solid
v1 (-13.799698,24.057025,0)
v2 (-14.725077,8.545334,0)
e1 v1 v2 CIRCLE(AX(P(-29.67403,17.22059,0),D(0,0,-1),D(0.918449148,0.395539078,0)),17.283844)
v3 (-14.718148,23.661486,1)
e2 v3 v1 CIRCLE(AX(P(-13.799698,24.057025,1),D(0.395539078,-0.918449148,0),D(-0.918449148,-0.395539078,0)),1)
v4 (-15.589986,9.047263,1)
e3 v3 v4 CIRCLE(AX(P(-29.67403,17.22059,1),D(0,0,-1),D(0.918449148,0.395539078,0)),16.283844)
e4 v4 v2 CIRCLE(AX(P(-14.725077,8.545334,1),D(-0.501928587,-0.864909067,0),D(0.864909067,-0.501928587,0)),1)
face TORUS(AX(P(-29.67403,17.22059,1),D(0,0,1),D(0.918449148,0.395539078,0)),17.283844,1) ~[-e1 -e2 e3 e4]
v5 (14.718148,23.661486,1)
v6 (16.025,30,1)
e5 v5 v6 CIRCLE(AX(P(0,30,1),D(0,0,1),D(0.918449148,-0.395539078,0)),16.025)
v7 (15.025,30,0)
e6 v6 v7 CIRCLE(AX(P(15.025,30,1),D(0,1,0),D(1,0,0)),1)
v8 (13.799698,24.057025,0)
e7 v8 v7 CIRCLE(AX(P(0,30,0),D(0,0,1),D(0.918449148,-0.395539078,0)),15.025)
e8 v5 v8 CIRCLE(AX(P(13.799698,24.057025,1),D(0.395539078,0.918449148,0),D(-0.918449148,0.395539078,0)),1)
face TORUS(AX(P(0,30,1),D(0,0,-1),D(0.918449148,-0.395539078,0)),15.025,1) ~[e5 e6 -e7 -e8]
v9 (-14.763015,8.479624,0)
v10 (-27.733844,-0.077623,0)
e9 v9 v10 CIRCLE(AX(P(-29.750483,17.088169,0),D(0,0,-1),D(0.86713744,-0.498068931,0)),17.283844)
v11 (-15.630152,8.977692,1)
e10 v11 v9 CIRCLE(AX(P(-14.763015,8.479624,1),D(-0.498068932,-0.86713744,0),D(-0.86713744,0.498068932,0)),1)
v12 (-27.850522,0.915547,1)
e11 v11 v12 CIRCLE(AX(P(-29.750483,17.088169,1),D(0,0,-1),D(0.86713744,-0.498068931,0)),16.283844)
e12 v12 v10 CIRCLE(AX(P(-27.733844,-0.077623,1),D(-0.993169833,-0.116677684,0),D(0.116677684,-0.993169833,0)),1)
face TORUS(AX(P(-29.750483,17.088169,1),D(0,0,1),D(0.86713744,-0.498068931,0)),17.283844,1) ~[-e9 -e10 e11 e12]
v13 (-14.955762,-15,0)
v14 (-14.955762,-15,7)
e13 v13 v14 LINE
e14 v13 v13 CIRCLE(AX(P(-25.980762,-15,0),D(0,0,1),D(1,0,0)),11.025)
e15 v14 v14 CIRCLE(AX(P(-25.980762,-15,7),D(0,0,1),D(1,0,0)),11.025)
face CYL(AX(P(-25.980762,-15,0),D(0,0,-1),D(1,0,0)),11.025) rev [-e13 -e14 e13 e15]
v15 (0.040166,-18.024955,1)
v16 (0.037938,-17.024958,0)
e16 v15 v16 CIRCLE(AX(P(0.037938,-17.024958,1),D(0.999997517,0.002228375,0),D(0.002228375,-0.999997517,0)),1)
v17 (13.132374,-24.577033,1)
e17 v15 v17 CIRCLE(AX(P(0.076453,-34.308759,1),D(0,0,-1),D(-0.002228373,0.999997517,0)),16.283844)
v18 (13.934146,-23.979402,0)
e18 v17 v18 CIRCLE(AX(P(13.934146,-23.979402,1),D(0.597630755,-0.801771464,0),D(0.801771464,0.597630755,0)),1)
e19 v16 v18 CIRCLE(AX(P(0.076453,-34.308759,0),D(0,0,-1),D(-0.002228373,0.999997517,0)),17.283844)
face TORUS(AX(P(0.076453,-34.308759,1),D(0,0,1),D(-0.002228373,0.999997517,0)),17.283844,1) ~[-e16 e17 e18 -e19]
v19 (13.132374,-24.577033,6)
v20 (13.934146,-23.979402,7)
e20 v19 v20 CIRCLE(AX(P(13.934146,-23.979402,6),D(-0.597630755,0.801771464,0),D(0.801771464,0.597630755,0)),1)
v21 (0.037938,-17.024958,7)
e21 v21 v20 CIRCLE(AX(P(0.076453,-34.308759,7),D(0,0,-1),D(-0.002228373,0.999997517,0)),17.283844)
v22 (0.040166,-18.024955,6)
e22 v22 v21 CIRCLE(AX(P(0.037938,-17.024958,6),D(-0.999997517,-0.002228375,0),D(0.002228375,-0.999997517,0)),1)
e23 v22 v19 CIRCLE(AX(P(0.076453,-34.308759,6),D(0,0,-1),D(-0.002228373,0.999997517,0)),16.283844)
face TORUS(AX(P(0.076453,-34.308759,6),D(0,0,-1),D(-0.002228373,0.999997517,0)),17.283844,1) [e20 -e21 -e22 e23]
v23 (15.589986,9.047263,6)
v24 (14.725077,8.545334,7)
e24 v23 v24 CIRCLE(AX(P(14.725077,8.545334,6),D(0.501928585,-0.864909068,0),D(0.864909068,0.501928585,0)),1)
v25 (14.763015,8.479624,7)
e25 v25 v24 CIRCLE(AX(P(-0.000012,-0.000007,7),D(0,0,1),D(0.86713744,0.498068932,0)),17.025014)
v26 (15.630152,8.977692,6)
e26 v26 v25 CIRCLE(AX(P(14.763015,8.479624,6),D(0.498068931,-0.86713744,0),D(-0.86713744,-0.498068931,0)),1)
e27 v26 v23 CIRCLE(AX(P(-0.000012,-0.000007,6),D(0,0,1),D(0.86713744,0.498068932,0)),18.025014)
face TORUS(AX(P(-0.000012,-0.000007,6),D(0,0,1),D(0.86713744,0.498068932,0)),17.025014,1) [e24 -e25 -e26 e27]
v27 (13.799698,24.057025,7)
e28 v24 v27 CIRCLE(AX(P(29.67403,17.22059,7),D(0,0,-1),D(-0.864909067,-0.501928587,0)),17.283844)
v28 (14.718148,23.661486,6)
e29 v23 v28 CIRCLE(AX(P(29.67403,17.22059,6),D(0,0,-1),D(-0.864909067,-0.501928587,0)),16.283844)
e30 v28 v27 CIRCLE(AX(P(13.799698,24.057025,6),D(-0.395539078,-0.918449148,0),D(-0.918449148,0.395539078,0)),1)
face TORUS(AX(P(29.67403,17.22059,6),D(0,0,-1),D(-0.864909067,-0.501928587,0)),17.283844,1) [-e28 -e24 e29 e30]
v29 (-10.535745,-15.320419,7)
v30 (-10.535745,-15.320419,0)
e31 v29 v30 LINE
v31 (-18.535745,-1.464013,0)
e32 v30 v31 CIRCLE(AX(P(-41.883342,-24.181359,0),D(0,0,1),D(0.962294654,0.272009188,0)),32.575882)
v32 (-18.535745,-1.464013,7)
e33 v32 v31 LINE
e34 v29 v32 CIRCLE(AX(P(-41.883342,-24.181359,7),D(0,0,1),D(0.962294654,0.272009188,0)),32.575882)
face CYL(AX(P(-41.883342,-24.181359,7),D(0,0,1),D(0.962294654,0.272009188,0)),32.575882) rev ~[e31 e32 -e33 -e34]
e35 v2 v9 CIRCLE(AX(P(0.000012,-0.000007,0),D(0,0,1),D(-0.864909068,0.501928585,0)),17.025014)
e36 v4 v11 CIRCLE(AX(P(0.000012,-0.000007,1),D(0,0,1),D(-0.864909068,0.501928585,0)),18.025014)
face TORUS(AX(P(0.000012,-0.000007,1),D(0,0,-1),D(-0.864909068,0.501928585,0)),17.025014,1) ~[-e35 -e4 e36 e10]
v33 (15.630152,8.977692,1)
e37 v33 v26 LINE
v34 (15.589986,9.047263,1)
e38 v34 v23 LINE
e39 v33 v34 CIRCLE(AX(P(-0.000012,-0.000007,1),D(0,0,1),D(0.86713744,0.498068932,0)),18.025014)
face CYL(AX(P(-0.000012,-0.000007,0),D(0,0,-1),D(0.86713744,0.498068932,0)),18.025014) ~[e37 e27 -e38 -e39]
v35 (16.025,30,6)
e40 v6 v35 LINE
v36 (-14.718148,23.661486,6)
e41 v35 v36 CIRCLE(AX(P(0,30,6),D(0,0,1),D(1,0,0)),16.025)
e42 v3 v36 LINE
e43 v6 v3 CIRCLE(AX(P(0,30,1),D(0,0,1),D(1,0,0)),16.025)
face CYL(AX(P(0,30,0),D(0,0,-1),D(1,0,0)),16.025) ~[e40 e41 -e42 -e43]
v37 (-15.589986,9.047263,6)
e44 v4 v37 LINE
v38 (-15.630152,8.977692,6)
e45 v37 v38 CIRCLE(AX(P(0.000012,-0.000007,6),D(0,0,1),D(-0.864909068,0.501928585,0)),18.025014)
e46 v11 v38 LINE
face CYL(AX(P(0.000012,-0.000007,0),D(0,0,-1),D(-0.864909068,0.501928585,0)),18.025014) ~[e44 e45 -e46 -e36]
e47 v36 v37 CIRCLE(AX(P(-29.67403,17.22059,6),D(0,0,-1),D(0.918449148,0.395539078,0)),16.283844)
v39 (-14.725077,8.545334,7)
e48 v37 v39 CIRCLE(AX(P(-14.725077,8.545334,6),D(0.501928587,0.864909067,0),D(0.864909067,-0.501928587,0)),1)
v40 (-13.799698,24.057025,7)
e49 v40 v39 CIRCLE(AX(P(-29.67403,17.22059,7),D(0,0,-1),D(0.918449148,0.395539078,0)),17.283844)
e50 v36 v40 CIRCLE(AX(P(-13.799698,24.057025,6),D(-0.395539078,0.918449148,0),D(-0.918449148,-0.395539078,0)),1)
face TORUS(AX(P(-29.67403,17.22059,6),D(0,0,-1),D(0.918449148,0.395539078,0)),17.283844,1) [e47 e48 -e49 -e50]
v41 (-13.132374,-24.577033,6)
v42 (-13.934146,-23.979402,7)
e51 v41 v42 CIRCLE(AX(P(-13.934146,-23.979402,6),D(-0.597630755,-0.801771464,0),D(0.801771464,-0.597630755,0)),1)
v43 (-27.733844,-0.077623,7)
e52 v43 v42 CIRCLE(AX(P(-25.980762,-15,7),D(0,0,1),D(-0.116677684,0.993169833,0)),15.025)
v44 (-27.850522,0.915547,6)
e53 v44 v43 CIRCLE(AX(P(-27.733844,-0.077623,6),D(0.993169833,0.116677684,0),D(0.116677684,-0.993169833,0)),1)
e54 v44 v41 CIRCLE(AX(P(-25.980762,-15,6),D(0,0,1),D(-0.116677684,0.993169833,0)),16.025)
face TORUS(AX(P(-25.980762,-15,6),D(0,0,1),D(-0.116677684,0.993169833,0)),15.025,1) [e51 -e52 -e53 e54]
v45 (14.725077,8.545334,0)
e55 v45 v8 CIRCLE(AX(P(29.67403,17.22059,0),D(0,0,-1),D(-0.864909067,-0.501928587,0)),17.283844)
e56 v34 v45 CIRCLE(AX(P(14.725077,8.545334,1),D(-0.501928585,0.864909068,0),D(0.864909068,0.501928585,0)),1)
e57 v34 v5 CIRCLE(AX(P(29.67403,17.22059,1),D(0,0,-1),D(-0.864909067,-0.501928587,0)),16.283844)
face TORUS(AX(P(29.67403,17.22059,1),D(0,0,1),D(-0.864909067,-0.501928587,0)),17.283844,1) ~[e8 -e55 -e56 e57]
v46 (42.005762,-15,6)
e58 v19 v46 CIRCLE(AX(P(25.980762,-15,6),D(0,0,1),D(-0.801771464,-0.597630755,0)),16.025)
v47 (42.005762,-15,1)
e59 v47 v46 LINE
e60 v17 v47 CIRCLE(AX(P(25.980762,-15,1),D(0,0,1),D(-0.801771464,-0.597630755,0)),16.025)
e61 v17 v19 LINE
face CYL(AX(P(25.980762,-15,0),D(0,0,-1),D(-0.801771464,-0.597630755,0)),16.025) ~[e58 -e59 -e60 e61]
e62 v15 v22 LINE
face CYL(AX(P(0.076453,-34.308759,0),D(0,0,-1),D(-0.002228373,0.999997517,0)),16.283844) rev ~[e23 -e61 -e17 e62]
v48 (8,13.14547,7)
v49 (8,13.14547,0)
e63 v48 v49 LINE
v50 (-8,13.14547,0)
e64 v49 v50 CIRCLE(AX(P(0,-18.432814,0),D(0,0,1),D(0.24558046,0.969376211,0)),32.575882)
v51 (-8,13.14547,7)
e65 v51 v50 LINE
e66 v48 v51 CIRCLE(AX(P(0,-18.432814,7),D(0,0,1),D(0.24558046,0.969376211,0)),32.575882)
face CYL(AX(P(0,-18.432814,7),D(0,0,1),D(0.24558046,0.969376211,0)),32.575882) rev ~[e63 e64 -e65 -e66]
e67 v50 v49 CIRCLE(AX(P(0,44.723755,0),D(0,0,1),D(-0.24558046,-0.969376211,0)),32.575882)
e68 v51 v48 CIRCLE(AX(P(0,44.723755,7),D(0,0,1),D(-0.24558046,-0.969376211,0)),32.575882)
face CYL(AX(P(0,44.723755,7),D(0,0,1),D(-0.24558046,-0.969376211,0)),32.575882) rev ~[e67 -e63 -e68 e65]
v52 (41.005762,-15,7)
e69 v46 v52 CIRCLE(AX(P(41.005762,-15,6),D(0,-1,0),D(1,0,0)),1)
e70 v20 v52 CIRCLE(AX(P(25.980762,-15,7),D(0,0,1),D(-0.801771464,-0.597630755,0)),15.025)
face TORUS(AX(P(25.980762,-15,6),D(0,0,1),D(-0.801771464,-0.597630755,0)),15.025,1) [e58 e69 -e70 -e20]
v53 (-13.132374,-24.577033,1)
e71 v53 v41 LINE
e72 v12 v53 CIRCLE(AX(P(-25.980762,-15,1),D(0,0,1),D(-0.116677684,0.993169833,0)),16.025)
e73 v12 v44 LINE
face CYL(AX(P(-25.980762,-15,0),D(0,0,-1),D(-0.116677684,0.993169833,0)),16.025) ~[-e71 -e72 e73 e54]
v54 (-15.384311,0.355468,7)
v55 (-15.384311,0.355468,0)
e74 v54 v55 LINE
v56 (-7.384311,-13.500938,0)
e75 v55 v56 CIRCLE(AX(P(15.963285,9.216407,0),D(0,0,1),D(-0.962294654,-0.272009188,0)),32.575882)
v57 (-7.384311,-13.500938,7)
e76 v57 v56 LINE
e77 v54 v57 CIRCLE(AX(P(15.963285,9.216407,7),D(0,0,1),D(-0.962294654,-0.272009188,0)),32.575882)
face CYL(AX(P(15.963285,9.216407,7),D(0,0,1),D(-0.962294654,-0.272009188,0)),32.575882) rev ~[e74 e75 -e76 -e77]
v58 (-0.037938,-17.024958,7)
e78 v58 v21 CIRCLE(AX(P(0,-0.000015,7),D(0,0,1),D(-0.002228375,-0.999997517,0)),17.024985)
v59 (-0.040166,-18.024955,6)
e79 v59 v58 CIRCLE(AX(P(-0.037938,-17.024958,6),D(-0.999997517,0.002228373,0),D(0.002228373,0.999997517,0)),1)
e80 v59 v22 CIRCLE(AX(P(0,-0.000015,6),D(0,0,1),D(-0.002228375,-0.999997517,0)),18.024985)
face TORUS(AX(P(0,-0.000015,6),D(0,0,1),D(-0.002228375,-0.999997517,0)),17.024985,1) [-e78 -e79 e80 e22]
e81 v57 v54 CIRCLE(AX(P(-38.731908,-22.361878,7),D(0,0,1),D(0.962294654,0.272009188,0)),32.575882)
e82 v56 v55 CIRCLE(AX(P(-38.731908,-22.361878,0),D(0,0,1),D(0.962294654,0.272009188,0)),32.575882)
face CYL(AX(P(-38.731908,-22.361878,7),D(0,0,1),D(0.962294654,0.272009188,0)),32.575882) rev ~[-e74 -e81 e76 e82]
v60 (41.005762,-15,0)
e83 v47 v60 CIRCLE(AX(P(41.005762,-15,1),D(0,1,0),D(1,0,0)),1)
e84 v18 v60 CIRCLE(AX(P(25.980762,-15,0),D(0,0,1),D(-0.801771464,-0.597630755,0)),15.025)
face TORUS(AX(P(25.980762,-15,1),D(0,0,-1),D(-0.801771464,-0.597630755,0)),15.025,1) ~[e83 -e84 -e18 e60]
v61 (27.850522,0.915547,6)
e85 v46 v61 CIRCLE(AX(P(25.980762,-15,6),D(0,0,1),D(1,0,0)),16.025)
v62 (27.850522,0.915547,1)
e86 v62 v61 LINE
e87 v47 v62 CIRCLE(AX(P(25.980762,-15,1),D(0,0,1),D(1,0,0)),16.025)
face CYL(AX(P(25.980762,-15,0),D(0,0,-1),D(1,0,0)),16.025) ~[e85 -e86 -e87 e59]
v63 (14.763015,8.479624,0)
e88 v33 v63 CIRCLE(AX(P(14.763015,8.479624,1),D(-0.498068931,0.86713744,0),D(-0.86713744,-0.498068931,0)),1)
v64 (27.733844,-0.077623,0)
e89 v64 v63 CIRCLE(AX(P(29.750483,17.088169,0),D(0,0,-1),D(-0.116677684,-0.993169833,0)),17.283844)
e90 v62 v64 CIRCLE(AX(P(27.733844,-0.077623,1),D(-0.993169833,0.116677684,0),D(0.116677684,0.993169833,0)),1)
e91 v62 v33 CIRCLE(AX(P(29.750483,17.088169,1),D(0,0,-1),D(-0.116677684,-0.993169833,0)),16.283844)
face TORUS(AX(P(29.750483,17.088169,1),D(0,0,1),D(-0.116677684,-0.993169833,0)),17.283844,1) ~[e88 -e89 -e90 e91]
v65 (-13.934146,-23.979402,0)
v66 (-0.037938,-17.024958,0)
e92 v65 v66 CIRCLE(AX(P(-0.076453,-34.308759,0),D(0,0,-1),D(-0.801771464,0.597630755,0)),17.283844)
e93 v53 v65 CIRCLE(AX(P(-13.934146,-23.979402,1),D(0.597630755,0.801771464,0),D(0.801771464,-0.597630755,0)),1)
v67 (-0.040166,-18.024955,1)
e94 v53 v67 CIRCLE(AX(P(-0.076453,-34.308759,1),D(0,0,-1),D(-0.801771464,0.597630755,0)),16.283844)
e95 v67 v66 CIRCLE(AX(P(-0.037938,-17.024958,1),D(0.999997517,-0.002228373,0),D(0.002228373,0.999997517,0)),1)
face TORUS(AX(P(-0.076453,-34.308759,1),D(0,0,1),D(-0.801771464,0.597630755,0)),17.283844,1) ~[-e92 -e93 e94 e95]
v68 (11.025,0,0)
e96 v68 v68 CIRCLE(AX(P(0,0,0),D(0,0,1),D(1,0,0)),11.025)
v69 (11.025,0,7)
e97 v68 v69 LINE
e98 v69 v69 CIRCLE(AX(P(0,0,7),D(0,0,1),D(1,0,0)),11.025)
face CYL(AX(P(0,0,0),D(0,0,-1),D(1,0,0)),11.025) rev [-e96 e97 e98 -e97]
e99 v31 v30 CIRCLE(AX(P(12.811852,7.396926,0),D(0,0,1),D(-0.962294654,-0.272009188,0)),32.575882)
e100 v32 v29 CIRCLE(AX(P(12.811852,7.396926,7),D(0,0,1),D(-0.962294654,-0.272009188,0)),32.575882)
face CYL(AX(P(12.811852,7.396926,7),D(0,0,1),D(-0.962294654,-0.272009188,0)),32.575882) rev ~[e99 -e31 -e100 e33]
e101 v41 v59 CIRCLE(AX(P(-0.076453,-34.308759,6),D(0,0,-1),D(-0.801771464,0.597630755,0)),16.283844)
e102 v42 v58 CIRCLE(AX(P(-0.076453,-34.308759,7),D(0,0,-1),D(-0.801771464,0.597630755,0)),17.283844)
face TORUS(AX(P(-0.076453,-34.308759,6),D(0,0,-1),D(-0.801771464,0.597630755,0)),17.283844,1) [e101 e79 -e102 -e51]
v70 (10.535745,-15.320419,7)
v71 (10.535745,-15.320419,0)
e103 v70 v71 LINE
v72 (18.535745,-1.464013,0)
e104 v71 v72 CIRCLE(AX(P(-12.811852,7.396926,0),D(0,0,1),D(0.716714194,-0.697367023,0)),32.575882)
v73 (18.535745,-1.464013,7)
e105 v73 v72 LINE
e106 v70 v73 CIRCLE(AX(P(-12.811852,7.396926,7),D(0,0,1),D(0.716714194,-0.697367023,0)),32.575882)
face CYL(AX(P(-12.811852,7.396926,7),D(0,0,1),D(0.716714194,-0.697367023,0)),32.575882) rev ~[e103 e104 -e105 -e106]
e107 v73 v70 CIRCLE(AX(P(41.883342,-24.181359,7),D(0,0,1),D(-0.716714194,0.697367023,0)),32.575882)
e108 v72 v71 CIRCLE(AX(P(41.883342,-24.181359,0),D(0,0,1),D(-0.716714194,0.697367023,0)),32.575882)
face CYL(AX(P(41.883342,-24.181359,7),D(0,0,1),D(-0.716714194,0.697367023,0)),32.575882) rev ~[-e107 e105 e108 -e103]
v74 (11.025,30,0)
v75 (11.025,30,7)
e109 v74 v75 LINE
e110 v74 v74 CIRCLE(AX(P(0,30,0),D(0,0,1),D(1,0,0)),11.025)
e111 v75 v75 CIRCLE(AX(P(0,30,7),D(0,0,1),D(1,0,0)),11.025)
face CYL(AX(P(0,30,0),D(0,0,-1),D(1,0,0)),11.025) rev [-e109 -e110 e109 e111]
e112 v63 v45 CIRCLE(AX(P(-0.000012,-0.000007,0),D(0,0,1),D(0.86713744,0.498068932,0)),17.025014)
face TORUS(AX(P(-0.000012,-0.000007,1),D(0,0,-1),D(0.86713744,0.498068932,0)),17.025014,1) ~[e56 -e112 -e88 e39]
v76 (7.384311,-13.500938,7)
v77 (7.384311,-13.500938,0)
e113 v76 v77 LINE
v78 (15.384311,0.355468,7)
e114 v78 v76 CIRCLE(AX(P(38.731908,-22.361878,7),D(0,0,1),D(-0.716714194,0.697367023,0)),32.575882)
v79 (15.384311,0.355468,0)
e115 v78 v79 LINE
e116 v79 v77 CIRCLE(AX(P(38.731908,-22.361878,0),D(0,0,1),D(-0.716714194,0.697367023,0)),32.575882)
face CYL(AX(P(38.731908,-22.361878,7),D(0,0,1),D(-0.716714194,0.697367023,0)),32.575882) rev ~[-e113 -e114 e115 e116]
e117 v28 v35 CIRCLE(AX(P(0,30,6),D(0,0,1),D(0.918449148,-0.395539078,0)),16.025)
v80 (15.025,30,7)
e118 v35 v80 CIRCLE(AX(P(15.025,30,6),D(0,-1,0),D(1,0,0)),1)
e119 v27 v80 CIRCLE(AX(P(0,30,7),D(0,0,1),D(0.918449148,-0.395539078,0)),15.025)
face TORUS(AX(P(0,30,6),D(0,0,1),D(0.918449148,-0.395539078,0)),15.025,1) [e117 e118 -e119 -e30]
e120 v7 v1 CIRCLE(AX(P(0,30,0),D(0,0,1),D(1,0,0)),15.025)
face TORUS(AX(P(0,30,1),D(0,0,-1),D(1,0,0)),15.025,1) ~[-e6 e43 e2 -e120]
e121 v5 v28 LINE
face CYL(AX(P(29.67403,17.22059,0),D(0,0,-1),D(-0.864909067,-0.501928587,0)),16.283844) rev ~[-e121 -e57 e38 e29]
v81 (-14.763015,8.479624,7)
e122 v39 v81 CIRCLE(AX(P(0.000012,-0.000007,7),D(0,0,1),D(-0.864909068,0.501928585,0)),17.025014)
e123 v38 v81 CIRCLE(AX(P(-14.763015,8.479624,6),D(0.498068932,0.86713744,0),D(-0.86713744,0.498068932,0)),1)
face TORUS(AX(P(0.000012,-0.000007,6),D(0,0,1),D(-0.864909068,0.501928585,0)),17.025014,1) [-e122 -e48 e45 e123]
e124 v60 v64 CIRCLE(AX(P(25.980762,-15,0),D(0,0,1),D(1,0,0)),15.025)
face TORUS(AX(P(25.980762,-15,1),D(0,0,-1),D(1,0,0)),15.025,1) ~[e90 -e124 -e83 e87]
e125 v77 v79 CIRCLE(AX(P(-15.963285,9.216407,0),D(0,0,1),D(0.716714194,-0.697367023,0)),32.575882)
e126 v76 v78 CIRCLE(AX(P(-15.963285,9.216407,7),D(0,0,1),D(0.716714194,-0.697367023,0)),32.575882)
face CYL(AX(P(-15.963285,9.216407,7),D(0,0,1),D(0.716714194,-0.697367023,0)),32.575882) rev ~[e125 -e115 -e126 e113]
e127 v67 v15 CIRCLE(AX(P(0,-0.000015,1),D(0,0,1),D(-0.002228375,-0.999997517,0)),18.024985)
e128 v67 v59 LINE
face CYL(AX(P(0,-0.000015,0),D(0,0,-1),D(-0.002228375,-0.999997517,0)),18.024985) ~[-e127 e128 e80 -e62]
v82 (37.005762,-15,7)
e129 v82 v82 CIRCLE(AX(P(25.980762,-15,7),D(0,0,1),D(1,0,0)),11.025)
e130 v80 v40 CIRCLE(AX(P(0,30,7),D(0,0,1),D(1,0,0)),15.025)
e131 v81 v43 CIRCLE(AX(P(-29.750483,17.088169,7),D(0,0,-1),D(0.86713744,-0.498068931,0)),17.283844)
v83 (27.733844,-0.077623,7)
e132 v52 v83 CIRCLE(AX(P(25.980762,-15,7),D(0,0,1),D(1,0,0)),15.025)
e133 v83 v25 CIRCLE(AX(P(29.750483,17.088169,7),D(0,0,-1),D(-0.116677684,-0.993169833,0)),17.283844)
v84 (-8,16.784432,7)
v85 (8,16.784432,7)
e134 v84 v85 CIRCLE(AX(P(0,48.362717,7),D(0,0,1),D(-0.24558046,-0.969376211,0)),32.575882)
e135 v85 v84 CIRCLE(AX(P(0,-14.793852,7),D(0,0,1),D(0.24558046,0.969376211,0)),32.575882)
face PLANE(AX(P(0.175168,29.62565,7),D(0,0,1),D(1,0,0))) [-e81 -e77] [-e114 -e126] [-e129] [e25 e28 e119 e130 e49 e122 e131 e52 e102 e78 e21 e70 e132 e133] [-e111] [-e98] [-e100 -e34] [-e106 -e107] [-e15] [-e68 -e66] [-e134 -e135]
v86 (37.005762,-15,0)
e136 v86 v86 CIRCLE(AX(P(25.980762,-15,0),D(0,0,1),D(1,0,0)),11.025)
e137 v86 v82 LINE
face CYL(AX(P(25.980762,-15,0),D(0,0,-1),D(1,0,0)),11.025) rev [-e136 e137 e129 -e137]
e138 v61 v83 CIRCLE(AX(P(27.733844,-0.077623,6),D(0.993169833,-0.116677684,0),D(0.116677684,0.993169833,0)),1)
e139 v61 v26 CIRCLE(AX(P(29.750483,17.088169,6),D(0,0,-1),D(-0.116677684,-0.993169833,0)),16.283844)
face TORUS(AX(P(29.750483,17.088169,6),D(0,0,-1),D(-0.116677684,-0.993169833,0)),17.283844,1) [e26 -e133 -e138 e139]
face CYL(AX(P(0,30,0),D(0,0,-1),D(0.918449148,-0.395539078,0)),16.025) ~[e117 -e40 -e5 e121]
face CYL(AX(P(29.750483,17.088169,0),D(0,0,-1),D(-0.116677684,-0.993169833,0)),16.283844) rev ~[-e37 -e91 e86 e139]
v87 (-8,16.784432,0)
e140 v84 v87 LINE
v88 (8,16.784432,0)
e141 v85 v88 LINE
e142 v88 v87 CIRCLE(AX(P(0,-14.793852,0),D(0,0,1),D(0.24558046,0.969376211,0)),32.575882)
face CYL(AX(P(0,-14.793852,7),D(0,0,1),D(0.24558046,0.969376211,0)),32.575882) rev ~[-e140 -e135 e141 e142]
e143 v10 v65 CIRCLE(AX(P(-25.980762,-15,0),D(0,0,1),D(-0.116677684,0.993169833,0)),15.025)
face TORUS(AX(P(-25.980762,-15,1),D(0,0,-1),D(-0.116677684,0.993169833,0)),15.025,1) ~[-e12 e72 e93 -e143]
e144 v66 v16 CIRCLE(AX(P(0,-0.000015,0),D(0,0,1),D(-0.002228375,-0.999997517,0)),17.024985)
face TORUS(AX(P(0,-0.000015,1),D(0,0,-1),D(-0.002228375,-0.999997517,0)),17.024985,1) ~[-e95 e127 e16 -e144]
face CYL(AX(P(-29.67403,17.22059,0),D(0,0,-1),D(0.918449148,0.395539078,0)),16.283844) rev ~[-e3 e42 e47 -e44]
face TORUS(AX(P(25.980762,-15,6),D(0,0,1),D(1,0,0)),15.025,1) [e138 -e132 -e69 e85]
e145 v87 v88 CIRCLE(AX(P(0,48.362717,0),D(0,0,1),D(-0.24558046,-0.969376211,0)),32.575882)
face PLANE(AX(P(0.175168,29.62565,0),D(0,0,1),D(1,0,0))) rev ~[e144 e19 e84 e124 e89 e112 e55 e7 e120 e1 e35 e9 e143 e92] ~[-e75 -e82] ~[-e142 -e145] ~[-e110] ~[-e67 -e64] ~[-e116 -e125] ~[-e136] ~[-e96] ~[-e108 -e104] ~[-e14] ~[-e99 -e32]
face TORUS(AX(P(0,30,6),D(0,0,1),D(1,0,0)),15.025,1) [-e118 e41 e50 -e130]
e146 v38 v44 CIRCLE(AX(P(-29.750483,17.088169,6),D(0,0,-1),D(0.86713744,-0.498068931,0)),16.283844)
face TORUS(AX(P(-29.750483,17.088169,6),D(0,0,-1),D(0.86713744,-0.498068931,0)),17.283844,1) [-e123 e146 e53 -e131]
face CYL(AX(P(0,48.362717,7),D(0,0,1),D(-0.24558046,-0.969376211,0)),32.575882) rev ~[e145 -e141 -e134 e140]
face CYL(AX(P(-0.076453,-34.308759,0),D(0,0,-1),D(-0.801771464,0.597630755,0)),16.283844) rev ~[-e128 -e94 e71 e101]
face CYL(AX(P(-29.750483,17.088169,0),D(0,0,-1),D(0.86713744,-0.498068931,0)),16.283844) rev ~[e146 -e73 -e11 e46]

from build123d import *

# Parameters (mm, degrees)
F0_R     = 11.025
F1_DEPTH = 7
F2_R     = 1
F4_DEPTH = 25


with BuildPart() as f1:
    # F0 (on Top) → F1 (new body)
    with BuildSketch(Plane.XY):
        with BuildLine():
            ThreePointArc((14.7181475974, 23.6614862702), (15.6948867509, 26.7640836111), (16.025, 30))
            ThreePointArc((16.025, 30), (-3.2359163889, 45.6948867509), (-14.7181475974, 23.6614862702))
            ThreePointArc((-14.7181475974, 23.6614862702), (-11.9828737003, 19.359917158), (-8.0350731173, 16.135))
            ThreePointArc((-8.0350731173, 16.135), (0, 18.025), (8.0350731173, 16.135))
            ThreePointArc((8.0350731173, 16.135), (11.9828737003, 19.359917158), (14.7181475974, 23.6614862702))
        make_face()
        with Locations((0, 30)):
            Circle(F0_R, mode=Mode.SUBTRACT)
        with BuildLine():
            ThreePointArc((-8.0350731173, 16.135), (-11.9828737003, 19.359917158), (-14.7181475974, 23.6614862702))
            ThreePointArc((-14.7181475974, 23.6614862702), (-13.4190857224, 16.250871043), (-15.58998593, 9.0472627741))
            ThreePointArc((-15.58998593, 9.0472627741), (-12.3326744258, 13.1455607149), (-8.0350731173, 16.135))
        make_face()
        with BuildLine():
            ThreePointArc((15.58998593, 9.0472627741), (13.4190857224, 16.250871043), (14.7181475974, 23.6614862702))
            ThreePointArc((14.7181475974, 23.6614862702), (11.9828737003, 19.359917158), (8.0350731173, 16.135))
            ThreePointArc((8.0350731173, 16.135), (12.3326744258, 13.1455607149), (15.58998593, 9.0472627741))
        make_face()
        with BuildLine():
            ThreePointArc((8.0350731173, 16.135), (0, 13.975), (-8.0350731173, 16.135))
            ThreePointArc((-8.0350731173, 16.135), (-12.3326744258, 13.1455607149), (-15.58998593, 9.0472627741))
            ThreePointArc((-15.58998593, 9.0472627741), (-15.6101079032, 9.0125), (-15.6301523621, 8.9776924729))
            ThreePointArc((-15.6301523621, 8.9776924729), (-17.5507267389, 4.1076289919), (-17.9908564487, -1.1089225592))
            ThreePointArc((-17.9908564487, -1.1089225592), (-12.1092289741, -6.9762107854), (-9.9557621135, -15))
            ThreePointArc((-9.9557621135, -15), (-9.955767418, -15.0130387247), (-9.9557833314, -15.0260774408))
            ThreePointArc((-9.9557833314, -15.0260774408), (-5.2180523132, -17.2531897067), (-0.0401664321, -18.024955247))
            ThreePointArc((-0.0401664321, -18.024955247), (0, -18.025), (0.0401664321, -18.024955247))
            ThreePointArc((0.0401664321, -18.024955247), (5.2180523132, -17.2531897067), (9.9557833314, -15.0260774408))
            ThreePointArc((9.9557833314, -15.0260774408), (12.1027050179, -6.9875), (17.9908564487, -1.1089225592))
            ThreePointArc((17.9908564487, -1.1089225592), (18.0164620901, -0.554724036), (18.025, 0))
            ThreePointArc((18.025, 0), (17.4160001339, 4.6458114831), (15.6301523621, 8.9776924729))
            ThreePointArc((15.6301523621, 8.9776924729), (15.6101079032, 9.0125), (15.58998593, 9.0472627741))
            ThreePointArc((15.58998593, 9.0472627741), (12.3326744258, 13.1455607149), (8.0350731173, 16.135))
        make_face()
        Circle(F0_R, mode=Mode.SUBTRACT)
        with BuildLine():
            ThreePointArc((-17.9908564487, -1.1089225592), (-17.5507267389, 4.1076289919), (-15.6301523621, 8.9776924729))
            ThreePointArc((-15.6301523621, 8.9776924729), (-20.783210018, 3.4958336097), (-27.850522, 0.9155465808))
            ThreePointArc((-27.850522, 0.9155465808), (-22.7576169242, 0.6975144557), (-17.9908564487, -1.1089225592))
        make_face()
        with BuildLine():
            ThreePointArc((27.850522, 0.9155465808), (20.783210018, 3.4958336097), (15.6301523621, 8.9776924729))
            ThreePointArc((15.6301523621, 8.9776924729), (17.4160001339, 4.6458114831), (18.025, 0))
            ThreePointArc((18.025, 0), (18.0164620901, -0.554724036), (17.9908564487, -1.1089225592))
            ThreePointArc((17.9908564487, -1.1089225592), (22.7576169242, 0.6975144557), (27.850522, 0.9155465808))
        make_face()
        with BuildLine():
            ThreePointArc((-9.9557833314, -15.0260774408), (-15.6101079032, -9.0125), (-17.9908564487, -1.1089225592))
            ThreePointArc((-17.9908564487, -1.1089225592), (-22.7576169242, 0.6975144557), (-27.850522, 0.9155465808))
            ThreePointArc((-27.850522, 0.9155465808), (-39.8588192092, -23.0125), (-13.1323744027, -24.5770328511))
            ThreePointArc((-13.1323744027, -24.5770328511), (-10.7747432239, -20.0574316138), (-9.9557833314, -15.0260774408))
        make_face()
        with Locations((-25.9807621135, -15)):
            Circle(F0_R, mode=Mode.SUBTRACT)
        with BuildLine():
            ThreePointArc((42.0057621135, -15), (37.9549745549, -4.3501708272), (27.850522, 0.9155465808))
            ThreePointArc((27.850522, 0.9155465808), (22.7576169242, 0.6975144557), (17.9908564487, -1.1089225592))
            ThreePointArc((17.9908564487, -1.1089225592), (15.6101079032, -9.0125), (9.9557833314, -15.0260774408))
            ThreePointArc((9.9557833314, -15.0260774408), (10.7747432239, -20.0574316138), (13.1323744027, -24.5770328511))
            ThreePointArc((13.1323744027, -24.5770328511), (31.0258196917, -30.2101288303), (42.0057621135, -15))
        make_face()
        with Locations((25.9807621135, -15)):
            Circle(F0_R, mode=Mode.SUBTRACT)
        with BuildLine():
            ThreePointArc((-0.0401664321, -18.024955247), (-5.2180523132, -17.2531897067), (-9.9557833314, -15.0260774408))
            ThreePointArc((-9.9557833314, -15.0260774408), (-10.7747432239, -20.0574316138), (-13.1323744027, -24.5770328511))
            ThreePointArc((-13.1323744027, -24.5770328511), (-7.3641242956, -19.7467046526), (-0.0401664321, -18.024955247))
        make_face()
        with BuildLine():
            ThreePointArc((13.1323744027, -24.5770328511), (10.7747432239, -20.0574316138), (9.9557833314, -15.0260774408))
            ThreePointArc((9.9557833314, -15.0260774408), (5.2180523132, -17.2531897067), (0.0401664321, -18.024955247))
            ThreePointArc((0.0401664321, -18.024955247), (7.3641242956, -19.7467046526), (13.1323744027, -24.5770328511))
        make_face()
        with BuildLine():
            ThreePointArc((-9.9557621135, -15), (-12.1092289741, -6.9762107854), (-17.9908564487, -1.1089225592))
            ThreePointArc((-17.9908564487, -1.1089225592), (-15.6101079032, -9.0125), (-9.9557833314, -15.0260774408))
            ThreePointArc((-9.9557833314, -15.0260774408), (-9.955767418, -15.0130387247), (-9.9557621135, -15))
        make_face()
        with BuildLine():
            ThreePointArc((8.0350731173, 16.135), (0, 18.025), (-8.0350731173, 16.135))
            ThreePointArc((-8.0350731173, 16.135), (0, 13.975), (8.0350731173, 16.135))
        make_face()
        with BuildLine():
            ThreePointArc((9.9557833314, -15.0260774408), (15.6101079032, -9.0125), (17.9908564487, -1.1089225592))
            ThreePointArc((17.9908564487, -1.1089225592), (12.1027050179, -6.9875), (9.9557833314, -15.0260774408))
        make_face()
    extrude(amount=F1_DEPTH)

    # F2
    f2_edges = [f1.edges().sort_by_distance(p)[0] for p in [
        (14.718148, 23.661486, 3.5),
        (-14.718148, 23.661486, 3.5),
        (0, 46.025, 0),
        (0, 46.025, 7),
        (-15.589986, 9.047263, 3.5),
        (-13.419086, 16.250871, 0),
        (-13.419086, 16.250871, 7),
        (-15.630152, 8.977692, 3.5),
        (-27.850522, 0.915547, 3.5),
        (-20.78321, 3.495834, 0),
        (-20.78321, 3.495834, 7),
        (-13.132374, -24.577033, 3.5),
        (-39.858819, -23.0125, 0),
        (-39.858819, -23.0125, 7),
        (0.040166, -18.024955, 3.5),
        (13.132374, -24.577033, 3.5),
        (7.364124, -19.746705, 0),
        (7.364124, -19.746705, 7),
    ]]
    fillet(f2_edges, radius=F2_R)

    # F3 (on face) → F4 (cut)
    with BuildSketch(Plane.XY.offset(7)):
        with BuildLine():
            ThreePointArc((-8, 16.7844323657), (0, 15.7868354251), (8, 16.7844323657))
            ThreePointArc((8, 16.7844323657), (0, 17.7820293063), (-8, 16.7844323657))
        make_face()
        with BuildLine():
            ThreePointArc((-8, 13.1454704053), (0, 12.1478734647), (8, 13.1454704053))
            ThreePointArc((8, 13.1454704053), (0, 14.1430673459), (-8, 13.1454704053))
        make_face()
        with BuildLine():
            ThreePointArc((-15.3843113157, 0.3554680276), (-12.248255609, -7.0715336729), (-7.3843113157, -13.5009384329))
            ThreePointArc((-7.3843113157, -13.5009384329), (-10.5203670224, -6.0739367324), (-15.3843113157, 0.3554680276))
        make_face()
        with BuildLine():
            ThreePointArc((-18.5357448168, -1.4640129526), (-15.3996891101, -8.8910146531), (-10.5357448168, -15.3204194131))
            ThreePointArc((-10.5357448168, -15.3204194131), (-13.6718005235, -7.8934177126), (-18.5357448168, -1.4640129526))
        make_face()
        with BuildLine():
            ThreePointArc((7.3843113157, -13.5009384329), (12.248255609, -7.0715336729), (15.3843113157, 0.3554680276))
            ThreePointArc((15.3843113157, 0.3554680276), (10.5203670224, -6.0739367324), (7.3843113157, -13.5009384329))
        make_face()
        with BuildLine():
            ThreePointArc((10.5357448168, -15.3204194131), (15.3996891101, -8.8910146531), (18.5357448168, -1.4640129526))
            ThreePointArc((18.5357448168, -1.4640129526), (13.6718005235, -7.8934177126), (10.5357448168, -15.3204194131))
        make_face()
    extrude(amount=-F4_DEPTH, mode=Mode.SUBTRACT)


solid = f1.part
